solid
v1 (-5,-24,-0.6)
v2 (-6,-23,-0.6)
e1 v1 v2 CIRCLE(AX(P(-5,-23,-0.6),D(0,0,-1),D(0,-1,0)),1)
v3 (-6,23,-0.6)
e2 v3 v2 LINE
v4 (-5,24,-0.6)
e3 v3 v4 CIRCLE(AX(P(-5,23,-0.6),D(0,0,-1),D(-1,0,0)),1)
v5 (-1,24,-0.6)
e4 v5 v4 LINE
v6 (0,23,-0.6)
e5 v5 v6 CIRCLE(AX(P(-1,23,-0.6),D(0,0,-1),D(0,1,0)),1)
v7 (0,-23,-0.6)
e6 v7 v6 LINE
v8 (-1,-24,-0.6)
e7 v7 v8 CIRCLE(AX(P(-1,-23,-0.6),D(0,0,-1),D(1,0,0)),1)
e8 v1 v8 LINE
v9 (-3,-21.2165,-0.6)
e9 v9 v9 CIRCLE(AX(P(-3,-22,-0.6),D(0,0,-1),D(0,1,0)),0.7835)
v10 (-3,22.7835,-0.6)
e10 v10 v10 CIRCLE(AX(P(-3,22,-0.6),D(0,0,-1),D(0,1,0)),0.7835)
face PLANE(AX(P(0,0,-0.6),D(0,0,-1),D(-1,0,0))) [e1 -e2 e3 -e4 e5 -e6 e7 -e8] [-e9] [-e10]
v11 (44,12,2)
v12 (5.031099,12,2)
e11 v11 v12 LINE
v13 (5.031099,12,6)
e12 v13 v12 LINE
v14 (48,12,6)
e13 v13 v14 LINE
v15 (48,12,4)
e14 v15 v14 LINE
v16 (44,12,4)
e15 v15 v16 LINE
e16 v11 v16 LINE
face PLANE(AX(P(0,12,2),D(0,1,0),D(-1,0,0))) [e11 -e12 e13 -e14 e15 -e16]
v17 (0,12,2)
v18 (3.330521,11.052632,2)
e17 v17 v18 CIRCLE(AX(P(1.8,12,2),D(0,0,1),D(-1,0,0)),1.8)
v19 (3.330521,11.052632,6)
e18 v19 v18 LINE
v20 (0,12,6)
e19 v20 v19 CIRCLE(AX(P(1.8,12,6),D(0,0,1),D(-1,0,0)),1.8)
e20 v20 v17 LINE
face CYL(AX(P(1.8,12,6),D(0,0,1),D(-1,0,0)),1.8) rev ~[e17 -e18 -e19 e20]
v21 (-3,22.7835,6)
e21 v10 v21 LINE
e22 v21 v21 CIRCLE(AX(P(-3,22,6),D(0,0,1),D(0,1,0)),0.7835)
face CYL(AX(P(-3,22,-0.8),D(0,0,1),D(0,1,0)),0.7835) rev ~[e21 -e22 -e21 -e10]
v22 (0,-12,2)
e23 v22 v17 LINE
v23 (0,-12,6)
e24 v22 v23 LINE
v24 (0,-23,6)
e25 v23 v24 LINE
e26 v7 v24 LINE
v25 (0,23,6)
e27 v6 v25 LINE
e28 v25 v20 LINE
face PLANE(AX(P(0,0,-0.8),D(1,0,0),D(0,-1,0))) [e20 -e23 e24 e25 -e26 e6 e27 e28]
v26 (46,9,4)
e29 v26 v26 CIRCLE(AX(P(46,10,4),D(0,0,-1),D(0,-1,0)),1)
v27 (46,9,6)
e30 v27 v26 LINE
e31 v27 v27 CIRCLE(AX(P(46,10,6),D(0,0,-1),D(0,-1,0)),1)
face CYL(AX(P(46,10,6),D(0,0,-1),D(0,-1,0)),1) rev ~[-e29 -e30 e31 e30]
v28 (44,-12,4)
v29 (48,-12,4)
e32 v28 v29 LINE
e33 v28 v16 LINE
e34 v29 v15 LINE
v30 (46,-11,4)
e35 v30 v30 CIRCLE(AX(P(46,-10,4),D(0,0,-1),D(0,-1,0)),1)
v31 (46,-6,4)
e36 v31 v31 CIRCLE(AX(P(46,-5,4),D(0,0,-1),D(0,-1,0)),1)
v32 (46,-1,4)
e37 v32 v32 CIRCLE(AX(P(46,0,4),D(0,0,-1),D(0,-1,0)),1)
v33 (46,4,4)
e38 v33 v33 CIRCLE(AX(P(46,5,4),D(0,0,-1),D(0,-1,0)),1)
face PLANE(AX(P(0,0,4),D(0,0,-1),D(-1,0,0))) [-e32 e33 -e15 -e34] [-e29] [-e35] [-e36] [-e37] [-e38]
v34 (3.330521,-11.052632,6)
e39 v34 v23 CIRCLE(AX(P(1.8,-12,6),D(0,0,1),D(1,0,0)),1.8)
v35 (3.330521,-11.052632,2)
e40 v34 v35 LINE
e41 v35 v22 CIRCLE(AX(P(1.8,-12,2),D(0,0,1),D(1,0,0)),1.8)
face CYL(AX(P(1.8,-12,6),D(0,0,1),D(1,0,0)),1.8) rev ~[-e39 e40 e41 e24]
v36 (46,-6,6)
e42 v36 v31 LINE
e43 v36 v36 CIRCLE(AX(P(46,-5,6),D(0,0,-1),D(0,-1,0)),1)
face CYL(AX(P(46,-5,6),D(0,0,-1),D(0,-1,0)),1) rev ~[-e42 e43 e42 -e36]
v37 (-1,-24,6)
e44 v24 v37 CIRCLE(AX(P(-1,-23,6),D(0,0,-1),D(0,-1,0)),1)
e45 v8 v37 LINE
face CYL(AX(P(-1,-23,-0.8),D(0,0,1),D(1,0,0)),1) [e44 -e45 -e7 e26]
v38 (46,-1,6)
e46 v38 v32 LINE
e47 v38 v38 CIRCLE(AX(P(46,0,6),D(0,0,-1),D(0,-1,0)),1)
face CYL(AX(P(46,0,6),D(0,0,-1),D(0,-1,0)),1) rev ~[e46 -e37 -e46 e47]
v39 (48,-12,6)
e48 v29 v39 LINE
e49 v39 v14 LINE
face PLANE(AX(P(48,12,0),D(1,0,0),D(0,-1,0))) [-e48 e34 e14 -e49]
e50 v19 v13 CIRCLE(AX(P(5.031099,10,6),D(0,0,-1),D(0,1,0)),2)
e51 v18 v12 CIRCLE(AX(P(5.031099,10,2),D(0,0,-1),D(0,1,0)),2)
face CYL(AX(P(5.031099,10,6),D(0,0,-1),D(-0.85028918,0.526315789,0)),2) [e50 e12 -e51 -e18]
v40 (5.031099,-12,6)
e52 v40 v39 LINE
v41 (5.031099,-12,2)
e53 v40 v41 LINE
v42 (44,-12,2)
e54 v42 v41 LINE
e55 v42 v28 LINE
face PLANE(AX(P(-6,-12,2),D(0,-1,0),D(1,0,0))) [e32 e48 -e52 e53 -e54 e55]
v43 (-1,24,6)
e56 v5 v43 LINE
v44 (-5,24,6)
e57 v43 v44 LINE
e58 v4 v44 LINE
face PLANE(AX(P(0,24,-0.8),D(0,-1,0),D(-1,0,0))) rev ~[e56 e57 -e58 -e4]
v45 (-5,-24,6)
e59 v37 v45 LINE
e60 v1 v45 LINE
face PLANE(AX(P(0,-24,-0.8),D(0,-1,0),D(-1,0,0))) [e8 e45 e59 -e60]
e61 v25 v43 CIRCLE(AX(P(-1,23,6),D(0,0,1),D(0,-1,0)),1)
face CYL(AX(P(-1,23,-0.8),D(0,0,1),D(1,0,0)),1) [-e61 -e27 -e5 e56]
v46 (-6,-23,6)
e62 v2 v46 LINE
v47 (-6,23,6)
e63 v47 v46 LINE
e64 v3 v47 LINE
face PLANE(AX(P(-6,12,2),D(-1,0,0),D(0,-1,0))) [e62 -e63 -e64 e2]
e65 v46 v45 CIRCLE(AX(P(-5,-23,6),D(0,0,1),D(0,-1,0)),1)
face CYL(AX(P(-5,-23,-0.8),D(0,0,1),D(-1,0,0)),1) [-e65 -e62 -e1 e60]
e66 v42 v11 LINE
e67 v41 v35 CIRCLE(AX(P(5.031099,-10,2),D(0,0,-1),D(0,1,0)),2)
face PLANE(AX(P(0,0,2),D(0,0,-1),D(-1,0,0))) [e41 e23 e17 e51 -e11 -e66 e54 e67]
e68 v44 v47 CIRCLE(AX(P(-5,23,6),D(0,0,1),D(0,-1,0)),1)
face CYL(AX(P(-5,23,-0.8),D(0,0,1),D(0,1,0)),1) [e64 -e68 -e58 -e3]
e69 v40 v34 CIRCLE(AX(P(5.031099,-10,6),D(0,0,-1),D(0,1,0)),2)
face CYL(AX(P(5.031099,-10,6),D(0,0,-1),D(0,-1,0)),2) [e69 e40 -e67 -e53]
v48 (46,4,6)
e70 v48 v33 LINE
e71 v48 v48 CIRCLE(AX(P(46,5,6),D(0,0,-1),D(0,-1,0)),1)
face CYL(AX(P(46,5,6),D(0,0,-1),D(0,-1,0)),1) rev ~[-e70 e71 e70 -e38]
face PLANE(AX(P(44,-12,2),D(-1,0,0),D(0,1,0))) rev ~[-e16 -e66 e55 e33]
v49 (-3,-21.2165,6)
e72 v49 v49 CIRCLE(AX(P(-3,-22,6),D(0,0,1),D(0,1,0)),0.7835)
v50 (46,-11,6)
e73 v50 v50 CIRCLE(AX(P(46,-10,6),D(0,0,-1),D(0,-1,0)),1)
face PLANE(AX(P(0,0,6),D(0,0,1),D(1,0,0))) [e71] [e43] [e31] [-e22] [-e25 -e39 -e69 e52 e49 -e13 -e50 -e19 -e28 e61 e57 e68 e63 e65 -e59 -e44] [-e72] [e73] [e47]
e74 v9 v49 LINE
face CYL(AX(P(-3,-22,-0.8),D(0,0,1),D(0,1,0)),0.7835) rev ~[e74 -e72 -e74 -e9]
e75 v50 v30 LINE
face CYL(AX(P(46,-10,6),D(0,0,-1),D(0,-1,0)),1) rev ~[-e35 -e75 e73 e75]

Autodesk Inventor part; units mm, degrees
ref_plane "YZ Plane" through (0, 0, 0) normal (1, 0, 0) x (0, 1, 0)
ref_plane "XZ Plane" through (0, 0, 0) normal (0, 1, 0) x (-1, 0, 0)
ref_plane "XY Plane" through (0, 0, 0) normal (0, 0, 1) x (1, 0, 0)
sketch "Skizze1" plane through (0, 0, 0) normal (0, 0, 1) x (1, 0, 0)
  line L0 (-6, 12) -> (48, 12)
  line L1 (48, 12) -> (48, -12)
  line L2 (48, -12) -> (-6, -12)
  line L3 (-16.8, 0) -> (58.8, 0) projected
  line L4 (0, 16.8) -> (0, -16.8) projected
  line L5 (-6, 12) -> (-6, -12)
  point P0 (0, 0)
  dimension "d2" = 24
  dimension "d3" = 54
  dimension "d59" = 6
extrude "Extrusion1" add sketch "Skizze1" along normal blind 6
sketch "Skizze2" plane through (0, 0, 0) normal (0, 0, -1) x (-1, 0, 0)
  line L0 (-48, -12) -> (6, -12) projected
  line L1 (-48, 12) -> (-48, -12) projected
  line L2 (-48, 12) -> (6, 12) projected
  line L3 (6, -12) -> (-48, -12)
  line L4 (-48, -12) -> (-48, 12)
  line L5 (-48, 12) -> (6, 12)
  line L6 (6, 12) -> (6, -12)
  point P0 (0, 0)
extrude "Extrusion2" cut sketch "Skizze2" against normal blind 2
sketch "Skizze3" plane through (0, 0, 2) normal (0, 0, -1) x (-1, 0, 0)
  line L0 (6, -12) -> (-48, -12) projected
  line L1 (-48, -12) -> (-48, 12) projected
  line L2 (-48, 12) -> (6, 12) projected
  line L3 (-48, -12) -> (-44, -12)
  line L4 (-44, -12) -> (-44, 12)
  line L5 (-44, 12) -> (-48, 12)
  line L6 (-48, 12) -> (-48, -12)
  point P0 (0, 0)
  point P1 (0, -12.5)
  dimension "d9" = 4
extrude "Extrusion3" cut sketch "Skizze3" against normal blind 2
sketch "Skizze4" plane through (0, 0, 6) normal (0, 0, 1) x (1, 0, 0)
  line L0 (48, -12) -> (48, 12) projected
  line L1 (-17, 0) -> (60, 0) projected
  point P0 (0, 0)
  point P1 (46, 0)
  dimension "d12" = 2
hole "Bohrung1" at (46, 0, 6) direction (0, 0, -1) diameter 2 end through all
pattern_linear "Rechteckige Anordnung1" count 5 spacing 5 along (0, 1, 0) of "Bohrung1" first direction both ways yes
sketch "Skizze7" plane through (0, 0, 2) normal (0, 0, -1) x (-1, 0, 0)
  line L0 (-44, 12) -> (-44, -12) projected
  line L1 (6, -12) -> (-44, -12) projected
  line L2 (6, 12) -> (6, -12) projected
  line L3 (-44, 12) -> (6, 12) projected
  line L4 (-48, 12) -> (6, 12) projected
  line L5 (6, -12) -> (0, -12)
  line L6 (0, -12) -> (0, 12)
  line L7 (0, 12) -> (6, 12)
  line L8 (6, 12) -> (6, -12)
  point P0 (0, 0)
extrude "Extrusion4" add sketch "Skizze7" along normal blind 2.8 contours L3 L2 L1 L6
sketch "Skizze8" plane through (0, 0, -0.8) normal (0, 0, -1) x (-1, 0, 0)
  line L0 (6, -12) -> (6, 12) projected
  line L1 (6, 12) -> (0, 12) projected
  line L2 (0, 12) -> (0, -12) projected
  line L3 (0, -12) -> (6, -12) projected
  line L4 (-58.8, 0) -> (16.8, 0) projected
  line L5 (6, 12) -> (0, 12)
  line L6 (0, 12) -> (0, 24)
  line L7 (0, 24) -> (6, 24)
  line L8 (6, 24) -> (6, 12)
  line L9 (6, -12) -> (-48, -12) projected
  line L10 (6, -12) -> (0, -12)
  line L11 (0, -12) -> (0, -24)
  line L12 (0, -24) -> (6, -24)
  line L13 (6, -24) -> (6, -12)
  line L14 (6, -12) -> (6, 12) projected
  dimension "d67" = 48
extrude "Extrusion5" add sketch "Skizze8" against normal up to surface (6.8 mm away)
sketch "Skizze9" plane through (0, 0, 6) normal (0, 0, 1) x (1, 0, 0)
  line L0 (0, -12) -> (48, -12) projected
  line L1 (48, -12) -> (48, 12) projected
  line L2 (48, 12) -> (0, 12) projected
  line L3 (0, 24) -> (0, 12) projected
  line L4 (-6, 24) -> (0, 24) projected
  line L5 (-6, -24) -> (-6, 24) projected
  line L6 (0, -24) -> (-6, -24) projected
  line L7 (0, -12) -> (0, -24) projected
  circle A0 centre (46, 0) radius 1 projected
  circle A1 centre (46, -10) radius 1 projected
  circle A2 centre (46, -5) radius 1 projected
  circle A3 centre (46, 5) radius 1 projected
  circle A4 centre (46, 10) radius 1 projected
  line L8 (44, 12) -> (0, 12) projected
  arc A5 (0, 12) -> (3.6, 12) centre (1.8, 12) ccw
  line L9 (0, -12) -> (44, -12) projected
  arc A6 (3.6, -12) -> (0, -12) centre (1.8, -12) ccw
  line L10 (-17, 0) -> (60, 0) projected
  point P0 (0, 0)
  dimension "d68" = 1.8
extrude "Extrusion6" cut sketch "Skizze9" against normal through all contours A6 L0 | L2 A5
fillet "Rundung1" radius 2 4 edges at (0, -12, 4) (3.6, -12, 4) (0, 12, 4) (3.6, 12, 4)
sketch "Skizze10" plane through (0, 0, -0.8) normal (0, 0, -1) x (-1, 0, 0)
  line L0 (0, -24) -> (0, 24) projected
  line L1 (-58.8, 0) -> (16.8, 0) projected
  line L2 (0, -22) -> (6, -22) construction
  line L3 (6, 24) -> (6, -24) projected
  point P0 (0, 0)
  point P1 (3, -22)
  point P2 (3, 22)
  dimension "d72" = 22
hole "Bohrung4" at (-3, -22, -0.8) at (-3, 22, -0.8) direction (0, 0, 1) diameter 1.567 end through all thread size "M2x0.4" class "6H" standard "ISO Metric profile"
fillet "Rundung2" radius 1 4 edges at (0, 24, 2.6) (-6, 24, 2.6) (0, -24, 2.6) (-6, -24, 2.6)
sketch "Skizze11" plane through (0, 0, -0.8) normal (0, 0, -1) x (-1, 0, 0)
  arc A0 (5, -24) -> (6, -23) centre (5, -23) ccw projected
  line L0 (6, 23) -> (6, -23) projected
  arc A1 (6, 23) -> (5, 24) centre (5, 23) ccw projected
  line L1 (1, 24) -> (5, 24) projected
  arc A2 (1, 24) -> (0, 23) centre (1, 23) ccw projected
  line L2 (0, -23) -> (0, 23) projected
  arc A3 (0, -23) -> (1, -24) centre (1, -23) ccw projected
  line L3 (5, -24) -> (1, -24) projected
  circle A4 centre (3, -22) radius 0.7835 projected
  circle A5 centre (3, 22) radius 0.7835 projected
  point P0 (0, 0)
extrude "Extrusion7" cut sketch "Skizze11" against normal blind 0.2
properties part number "Kicker Chip" material "Aluminium 6061"
